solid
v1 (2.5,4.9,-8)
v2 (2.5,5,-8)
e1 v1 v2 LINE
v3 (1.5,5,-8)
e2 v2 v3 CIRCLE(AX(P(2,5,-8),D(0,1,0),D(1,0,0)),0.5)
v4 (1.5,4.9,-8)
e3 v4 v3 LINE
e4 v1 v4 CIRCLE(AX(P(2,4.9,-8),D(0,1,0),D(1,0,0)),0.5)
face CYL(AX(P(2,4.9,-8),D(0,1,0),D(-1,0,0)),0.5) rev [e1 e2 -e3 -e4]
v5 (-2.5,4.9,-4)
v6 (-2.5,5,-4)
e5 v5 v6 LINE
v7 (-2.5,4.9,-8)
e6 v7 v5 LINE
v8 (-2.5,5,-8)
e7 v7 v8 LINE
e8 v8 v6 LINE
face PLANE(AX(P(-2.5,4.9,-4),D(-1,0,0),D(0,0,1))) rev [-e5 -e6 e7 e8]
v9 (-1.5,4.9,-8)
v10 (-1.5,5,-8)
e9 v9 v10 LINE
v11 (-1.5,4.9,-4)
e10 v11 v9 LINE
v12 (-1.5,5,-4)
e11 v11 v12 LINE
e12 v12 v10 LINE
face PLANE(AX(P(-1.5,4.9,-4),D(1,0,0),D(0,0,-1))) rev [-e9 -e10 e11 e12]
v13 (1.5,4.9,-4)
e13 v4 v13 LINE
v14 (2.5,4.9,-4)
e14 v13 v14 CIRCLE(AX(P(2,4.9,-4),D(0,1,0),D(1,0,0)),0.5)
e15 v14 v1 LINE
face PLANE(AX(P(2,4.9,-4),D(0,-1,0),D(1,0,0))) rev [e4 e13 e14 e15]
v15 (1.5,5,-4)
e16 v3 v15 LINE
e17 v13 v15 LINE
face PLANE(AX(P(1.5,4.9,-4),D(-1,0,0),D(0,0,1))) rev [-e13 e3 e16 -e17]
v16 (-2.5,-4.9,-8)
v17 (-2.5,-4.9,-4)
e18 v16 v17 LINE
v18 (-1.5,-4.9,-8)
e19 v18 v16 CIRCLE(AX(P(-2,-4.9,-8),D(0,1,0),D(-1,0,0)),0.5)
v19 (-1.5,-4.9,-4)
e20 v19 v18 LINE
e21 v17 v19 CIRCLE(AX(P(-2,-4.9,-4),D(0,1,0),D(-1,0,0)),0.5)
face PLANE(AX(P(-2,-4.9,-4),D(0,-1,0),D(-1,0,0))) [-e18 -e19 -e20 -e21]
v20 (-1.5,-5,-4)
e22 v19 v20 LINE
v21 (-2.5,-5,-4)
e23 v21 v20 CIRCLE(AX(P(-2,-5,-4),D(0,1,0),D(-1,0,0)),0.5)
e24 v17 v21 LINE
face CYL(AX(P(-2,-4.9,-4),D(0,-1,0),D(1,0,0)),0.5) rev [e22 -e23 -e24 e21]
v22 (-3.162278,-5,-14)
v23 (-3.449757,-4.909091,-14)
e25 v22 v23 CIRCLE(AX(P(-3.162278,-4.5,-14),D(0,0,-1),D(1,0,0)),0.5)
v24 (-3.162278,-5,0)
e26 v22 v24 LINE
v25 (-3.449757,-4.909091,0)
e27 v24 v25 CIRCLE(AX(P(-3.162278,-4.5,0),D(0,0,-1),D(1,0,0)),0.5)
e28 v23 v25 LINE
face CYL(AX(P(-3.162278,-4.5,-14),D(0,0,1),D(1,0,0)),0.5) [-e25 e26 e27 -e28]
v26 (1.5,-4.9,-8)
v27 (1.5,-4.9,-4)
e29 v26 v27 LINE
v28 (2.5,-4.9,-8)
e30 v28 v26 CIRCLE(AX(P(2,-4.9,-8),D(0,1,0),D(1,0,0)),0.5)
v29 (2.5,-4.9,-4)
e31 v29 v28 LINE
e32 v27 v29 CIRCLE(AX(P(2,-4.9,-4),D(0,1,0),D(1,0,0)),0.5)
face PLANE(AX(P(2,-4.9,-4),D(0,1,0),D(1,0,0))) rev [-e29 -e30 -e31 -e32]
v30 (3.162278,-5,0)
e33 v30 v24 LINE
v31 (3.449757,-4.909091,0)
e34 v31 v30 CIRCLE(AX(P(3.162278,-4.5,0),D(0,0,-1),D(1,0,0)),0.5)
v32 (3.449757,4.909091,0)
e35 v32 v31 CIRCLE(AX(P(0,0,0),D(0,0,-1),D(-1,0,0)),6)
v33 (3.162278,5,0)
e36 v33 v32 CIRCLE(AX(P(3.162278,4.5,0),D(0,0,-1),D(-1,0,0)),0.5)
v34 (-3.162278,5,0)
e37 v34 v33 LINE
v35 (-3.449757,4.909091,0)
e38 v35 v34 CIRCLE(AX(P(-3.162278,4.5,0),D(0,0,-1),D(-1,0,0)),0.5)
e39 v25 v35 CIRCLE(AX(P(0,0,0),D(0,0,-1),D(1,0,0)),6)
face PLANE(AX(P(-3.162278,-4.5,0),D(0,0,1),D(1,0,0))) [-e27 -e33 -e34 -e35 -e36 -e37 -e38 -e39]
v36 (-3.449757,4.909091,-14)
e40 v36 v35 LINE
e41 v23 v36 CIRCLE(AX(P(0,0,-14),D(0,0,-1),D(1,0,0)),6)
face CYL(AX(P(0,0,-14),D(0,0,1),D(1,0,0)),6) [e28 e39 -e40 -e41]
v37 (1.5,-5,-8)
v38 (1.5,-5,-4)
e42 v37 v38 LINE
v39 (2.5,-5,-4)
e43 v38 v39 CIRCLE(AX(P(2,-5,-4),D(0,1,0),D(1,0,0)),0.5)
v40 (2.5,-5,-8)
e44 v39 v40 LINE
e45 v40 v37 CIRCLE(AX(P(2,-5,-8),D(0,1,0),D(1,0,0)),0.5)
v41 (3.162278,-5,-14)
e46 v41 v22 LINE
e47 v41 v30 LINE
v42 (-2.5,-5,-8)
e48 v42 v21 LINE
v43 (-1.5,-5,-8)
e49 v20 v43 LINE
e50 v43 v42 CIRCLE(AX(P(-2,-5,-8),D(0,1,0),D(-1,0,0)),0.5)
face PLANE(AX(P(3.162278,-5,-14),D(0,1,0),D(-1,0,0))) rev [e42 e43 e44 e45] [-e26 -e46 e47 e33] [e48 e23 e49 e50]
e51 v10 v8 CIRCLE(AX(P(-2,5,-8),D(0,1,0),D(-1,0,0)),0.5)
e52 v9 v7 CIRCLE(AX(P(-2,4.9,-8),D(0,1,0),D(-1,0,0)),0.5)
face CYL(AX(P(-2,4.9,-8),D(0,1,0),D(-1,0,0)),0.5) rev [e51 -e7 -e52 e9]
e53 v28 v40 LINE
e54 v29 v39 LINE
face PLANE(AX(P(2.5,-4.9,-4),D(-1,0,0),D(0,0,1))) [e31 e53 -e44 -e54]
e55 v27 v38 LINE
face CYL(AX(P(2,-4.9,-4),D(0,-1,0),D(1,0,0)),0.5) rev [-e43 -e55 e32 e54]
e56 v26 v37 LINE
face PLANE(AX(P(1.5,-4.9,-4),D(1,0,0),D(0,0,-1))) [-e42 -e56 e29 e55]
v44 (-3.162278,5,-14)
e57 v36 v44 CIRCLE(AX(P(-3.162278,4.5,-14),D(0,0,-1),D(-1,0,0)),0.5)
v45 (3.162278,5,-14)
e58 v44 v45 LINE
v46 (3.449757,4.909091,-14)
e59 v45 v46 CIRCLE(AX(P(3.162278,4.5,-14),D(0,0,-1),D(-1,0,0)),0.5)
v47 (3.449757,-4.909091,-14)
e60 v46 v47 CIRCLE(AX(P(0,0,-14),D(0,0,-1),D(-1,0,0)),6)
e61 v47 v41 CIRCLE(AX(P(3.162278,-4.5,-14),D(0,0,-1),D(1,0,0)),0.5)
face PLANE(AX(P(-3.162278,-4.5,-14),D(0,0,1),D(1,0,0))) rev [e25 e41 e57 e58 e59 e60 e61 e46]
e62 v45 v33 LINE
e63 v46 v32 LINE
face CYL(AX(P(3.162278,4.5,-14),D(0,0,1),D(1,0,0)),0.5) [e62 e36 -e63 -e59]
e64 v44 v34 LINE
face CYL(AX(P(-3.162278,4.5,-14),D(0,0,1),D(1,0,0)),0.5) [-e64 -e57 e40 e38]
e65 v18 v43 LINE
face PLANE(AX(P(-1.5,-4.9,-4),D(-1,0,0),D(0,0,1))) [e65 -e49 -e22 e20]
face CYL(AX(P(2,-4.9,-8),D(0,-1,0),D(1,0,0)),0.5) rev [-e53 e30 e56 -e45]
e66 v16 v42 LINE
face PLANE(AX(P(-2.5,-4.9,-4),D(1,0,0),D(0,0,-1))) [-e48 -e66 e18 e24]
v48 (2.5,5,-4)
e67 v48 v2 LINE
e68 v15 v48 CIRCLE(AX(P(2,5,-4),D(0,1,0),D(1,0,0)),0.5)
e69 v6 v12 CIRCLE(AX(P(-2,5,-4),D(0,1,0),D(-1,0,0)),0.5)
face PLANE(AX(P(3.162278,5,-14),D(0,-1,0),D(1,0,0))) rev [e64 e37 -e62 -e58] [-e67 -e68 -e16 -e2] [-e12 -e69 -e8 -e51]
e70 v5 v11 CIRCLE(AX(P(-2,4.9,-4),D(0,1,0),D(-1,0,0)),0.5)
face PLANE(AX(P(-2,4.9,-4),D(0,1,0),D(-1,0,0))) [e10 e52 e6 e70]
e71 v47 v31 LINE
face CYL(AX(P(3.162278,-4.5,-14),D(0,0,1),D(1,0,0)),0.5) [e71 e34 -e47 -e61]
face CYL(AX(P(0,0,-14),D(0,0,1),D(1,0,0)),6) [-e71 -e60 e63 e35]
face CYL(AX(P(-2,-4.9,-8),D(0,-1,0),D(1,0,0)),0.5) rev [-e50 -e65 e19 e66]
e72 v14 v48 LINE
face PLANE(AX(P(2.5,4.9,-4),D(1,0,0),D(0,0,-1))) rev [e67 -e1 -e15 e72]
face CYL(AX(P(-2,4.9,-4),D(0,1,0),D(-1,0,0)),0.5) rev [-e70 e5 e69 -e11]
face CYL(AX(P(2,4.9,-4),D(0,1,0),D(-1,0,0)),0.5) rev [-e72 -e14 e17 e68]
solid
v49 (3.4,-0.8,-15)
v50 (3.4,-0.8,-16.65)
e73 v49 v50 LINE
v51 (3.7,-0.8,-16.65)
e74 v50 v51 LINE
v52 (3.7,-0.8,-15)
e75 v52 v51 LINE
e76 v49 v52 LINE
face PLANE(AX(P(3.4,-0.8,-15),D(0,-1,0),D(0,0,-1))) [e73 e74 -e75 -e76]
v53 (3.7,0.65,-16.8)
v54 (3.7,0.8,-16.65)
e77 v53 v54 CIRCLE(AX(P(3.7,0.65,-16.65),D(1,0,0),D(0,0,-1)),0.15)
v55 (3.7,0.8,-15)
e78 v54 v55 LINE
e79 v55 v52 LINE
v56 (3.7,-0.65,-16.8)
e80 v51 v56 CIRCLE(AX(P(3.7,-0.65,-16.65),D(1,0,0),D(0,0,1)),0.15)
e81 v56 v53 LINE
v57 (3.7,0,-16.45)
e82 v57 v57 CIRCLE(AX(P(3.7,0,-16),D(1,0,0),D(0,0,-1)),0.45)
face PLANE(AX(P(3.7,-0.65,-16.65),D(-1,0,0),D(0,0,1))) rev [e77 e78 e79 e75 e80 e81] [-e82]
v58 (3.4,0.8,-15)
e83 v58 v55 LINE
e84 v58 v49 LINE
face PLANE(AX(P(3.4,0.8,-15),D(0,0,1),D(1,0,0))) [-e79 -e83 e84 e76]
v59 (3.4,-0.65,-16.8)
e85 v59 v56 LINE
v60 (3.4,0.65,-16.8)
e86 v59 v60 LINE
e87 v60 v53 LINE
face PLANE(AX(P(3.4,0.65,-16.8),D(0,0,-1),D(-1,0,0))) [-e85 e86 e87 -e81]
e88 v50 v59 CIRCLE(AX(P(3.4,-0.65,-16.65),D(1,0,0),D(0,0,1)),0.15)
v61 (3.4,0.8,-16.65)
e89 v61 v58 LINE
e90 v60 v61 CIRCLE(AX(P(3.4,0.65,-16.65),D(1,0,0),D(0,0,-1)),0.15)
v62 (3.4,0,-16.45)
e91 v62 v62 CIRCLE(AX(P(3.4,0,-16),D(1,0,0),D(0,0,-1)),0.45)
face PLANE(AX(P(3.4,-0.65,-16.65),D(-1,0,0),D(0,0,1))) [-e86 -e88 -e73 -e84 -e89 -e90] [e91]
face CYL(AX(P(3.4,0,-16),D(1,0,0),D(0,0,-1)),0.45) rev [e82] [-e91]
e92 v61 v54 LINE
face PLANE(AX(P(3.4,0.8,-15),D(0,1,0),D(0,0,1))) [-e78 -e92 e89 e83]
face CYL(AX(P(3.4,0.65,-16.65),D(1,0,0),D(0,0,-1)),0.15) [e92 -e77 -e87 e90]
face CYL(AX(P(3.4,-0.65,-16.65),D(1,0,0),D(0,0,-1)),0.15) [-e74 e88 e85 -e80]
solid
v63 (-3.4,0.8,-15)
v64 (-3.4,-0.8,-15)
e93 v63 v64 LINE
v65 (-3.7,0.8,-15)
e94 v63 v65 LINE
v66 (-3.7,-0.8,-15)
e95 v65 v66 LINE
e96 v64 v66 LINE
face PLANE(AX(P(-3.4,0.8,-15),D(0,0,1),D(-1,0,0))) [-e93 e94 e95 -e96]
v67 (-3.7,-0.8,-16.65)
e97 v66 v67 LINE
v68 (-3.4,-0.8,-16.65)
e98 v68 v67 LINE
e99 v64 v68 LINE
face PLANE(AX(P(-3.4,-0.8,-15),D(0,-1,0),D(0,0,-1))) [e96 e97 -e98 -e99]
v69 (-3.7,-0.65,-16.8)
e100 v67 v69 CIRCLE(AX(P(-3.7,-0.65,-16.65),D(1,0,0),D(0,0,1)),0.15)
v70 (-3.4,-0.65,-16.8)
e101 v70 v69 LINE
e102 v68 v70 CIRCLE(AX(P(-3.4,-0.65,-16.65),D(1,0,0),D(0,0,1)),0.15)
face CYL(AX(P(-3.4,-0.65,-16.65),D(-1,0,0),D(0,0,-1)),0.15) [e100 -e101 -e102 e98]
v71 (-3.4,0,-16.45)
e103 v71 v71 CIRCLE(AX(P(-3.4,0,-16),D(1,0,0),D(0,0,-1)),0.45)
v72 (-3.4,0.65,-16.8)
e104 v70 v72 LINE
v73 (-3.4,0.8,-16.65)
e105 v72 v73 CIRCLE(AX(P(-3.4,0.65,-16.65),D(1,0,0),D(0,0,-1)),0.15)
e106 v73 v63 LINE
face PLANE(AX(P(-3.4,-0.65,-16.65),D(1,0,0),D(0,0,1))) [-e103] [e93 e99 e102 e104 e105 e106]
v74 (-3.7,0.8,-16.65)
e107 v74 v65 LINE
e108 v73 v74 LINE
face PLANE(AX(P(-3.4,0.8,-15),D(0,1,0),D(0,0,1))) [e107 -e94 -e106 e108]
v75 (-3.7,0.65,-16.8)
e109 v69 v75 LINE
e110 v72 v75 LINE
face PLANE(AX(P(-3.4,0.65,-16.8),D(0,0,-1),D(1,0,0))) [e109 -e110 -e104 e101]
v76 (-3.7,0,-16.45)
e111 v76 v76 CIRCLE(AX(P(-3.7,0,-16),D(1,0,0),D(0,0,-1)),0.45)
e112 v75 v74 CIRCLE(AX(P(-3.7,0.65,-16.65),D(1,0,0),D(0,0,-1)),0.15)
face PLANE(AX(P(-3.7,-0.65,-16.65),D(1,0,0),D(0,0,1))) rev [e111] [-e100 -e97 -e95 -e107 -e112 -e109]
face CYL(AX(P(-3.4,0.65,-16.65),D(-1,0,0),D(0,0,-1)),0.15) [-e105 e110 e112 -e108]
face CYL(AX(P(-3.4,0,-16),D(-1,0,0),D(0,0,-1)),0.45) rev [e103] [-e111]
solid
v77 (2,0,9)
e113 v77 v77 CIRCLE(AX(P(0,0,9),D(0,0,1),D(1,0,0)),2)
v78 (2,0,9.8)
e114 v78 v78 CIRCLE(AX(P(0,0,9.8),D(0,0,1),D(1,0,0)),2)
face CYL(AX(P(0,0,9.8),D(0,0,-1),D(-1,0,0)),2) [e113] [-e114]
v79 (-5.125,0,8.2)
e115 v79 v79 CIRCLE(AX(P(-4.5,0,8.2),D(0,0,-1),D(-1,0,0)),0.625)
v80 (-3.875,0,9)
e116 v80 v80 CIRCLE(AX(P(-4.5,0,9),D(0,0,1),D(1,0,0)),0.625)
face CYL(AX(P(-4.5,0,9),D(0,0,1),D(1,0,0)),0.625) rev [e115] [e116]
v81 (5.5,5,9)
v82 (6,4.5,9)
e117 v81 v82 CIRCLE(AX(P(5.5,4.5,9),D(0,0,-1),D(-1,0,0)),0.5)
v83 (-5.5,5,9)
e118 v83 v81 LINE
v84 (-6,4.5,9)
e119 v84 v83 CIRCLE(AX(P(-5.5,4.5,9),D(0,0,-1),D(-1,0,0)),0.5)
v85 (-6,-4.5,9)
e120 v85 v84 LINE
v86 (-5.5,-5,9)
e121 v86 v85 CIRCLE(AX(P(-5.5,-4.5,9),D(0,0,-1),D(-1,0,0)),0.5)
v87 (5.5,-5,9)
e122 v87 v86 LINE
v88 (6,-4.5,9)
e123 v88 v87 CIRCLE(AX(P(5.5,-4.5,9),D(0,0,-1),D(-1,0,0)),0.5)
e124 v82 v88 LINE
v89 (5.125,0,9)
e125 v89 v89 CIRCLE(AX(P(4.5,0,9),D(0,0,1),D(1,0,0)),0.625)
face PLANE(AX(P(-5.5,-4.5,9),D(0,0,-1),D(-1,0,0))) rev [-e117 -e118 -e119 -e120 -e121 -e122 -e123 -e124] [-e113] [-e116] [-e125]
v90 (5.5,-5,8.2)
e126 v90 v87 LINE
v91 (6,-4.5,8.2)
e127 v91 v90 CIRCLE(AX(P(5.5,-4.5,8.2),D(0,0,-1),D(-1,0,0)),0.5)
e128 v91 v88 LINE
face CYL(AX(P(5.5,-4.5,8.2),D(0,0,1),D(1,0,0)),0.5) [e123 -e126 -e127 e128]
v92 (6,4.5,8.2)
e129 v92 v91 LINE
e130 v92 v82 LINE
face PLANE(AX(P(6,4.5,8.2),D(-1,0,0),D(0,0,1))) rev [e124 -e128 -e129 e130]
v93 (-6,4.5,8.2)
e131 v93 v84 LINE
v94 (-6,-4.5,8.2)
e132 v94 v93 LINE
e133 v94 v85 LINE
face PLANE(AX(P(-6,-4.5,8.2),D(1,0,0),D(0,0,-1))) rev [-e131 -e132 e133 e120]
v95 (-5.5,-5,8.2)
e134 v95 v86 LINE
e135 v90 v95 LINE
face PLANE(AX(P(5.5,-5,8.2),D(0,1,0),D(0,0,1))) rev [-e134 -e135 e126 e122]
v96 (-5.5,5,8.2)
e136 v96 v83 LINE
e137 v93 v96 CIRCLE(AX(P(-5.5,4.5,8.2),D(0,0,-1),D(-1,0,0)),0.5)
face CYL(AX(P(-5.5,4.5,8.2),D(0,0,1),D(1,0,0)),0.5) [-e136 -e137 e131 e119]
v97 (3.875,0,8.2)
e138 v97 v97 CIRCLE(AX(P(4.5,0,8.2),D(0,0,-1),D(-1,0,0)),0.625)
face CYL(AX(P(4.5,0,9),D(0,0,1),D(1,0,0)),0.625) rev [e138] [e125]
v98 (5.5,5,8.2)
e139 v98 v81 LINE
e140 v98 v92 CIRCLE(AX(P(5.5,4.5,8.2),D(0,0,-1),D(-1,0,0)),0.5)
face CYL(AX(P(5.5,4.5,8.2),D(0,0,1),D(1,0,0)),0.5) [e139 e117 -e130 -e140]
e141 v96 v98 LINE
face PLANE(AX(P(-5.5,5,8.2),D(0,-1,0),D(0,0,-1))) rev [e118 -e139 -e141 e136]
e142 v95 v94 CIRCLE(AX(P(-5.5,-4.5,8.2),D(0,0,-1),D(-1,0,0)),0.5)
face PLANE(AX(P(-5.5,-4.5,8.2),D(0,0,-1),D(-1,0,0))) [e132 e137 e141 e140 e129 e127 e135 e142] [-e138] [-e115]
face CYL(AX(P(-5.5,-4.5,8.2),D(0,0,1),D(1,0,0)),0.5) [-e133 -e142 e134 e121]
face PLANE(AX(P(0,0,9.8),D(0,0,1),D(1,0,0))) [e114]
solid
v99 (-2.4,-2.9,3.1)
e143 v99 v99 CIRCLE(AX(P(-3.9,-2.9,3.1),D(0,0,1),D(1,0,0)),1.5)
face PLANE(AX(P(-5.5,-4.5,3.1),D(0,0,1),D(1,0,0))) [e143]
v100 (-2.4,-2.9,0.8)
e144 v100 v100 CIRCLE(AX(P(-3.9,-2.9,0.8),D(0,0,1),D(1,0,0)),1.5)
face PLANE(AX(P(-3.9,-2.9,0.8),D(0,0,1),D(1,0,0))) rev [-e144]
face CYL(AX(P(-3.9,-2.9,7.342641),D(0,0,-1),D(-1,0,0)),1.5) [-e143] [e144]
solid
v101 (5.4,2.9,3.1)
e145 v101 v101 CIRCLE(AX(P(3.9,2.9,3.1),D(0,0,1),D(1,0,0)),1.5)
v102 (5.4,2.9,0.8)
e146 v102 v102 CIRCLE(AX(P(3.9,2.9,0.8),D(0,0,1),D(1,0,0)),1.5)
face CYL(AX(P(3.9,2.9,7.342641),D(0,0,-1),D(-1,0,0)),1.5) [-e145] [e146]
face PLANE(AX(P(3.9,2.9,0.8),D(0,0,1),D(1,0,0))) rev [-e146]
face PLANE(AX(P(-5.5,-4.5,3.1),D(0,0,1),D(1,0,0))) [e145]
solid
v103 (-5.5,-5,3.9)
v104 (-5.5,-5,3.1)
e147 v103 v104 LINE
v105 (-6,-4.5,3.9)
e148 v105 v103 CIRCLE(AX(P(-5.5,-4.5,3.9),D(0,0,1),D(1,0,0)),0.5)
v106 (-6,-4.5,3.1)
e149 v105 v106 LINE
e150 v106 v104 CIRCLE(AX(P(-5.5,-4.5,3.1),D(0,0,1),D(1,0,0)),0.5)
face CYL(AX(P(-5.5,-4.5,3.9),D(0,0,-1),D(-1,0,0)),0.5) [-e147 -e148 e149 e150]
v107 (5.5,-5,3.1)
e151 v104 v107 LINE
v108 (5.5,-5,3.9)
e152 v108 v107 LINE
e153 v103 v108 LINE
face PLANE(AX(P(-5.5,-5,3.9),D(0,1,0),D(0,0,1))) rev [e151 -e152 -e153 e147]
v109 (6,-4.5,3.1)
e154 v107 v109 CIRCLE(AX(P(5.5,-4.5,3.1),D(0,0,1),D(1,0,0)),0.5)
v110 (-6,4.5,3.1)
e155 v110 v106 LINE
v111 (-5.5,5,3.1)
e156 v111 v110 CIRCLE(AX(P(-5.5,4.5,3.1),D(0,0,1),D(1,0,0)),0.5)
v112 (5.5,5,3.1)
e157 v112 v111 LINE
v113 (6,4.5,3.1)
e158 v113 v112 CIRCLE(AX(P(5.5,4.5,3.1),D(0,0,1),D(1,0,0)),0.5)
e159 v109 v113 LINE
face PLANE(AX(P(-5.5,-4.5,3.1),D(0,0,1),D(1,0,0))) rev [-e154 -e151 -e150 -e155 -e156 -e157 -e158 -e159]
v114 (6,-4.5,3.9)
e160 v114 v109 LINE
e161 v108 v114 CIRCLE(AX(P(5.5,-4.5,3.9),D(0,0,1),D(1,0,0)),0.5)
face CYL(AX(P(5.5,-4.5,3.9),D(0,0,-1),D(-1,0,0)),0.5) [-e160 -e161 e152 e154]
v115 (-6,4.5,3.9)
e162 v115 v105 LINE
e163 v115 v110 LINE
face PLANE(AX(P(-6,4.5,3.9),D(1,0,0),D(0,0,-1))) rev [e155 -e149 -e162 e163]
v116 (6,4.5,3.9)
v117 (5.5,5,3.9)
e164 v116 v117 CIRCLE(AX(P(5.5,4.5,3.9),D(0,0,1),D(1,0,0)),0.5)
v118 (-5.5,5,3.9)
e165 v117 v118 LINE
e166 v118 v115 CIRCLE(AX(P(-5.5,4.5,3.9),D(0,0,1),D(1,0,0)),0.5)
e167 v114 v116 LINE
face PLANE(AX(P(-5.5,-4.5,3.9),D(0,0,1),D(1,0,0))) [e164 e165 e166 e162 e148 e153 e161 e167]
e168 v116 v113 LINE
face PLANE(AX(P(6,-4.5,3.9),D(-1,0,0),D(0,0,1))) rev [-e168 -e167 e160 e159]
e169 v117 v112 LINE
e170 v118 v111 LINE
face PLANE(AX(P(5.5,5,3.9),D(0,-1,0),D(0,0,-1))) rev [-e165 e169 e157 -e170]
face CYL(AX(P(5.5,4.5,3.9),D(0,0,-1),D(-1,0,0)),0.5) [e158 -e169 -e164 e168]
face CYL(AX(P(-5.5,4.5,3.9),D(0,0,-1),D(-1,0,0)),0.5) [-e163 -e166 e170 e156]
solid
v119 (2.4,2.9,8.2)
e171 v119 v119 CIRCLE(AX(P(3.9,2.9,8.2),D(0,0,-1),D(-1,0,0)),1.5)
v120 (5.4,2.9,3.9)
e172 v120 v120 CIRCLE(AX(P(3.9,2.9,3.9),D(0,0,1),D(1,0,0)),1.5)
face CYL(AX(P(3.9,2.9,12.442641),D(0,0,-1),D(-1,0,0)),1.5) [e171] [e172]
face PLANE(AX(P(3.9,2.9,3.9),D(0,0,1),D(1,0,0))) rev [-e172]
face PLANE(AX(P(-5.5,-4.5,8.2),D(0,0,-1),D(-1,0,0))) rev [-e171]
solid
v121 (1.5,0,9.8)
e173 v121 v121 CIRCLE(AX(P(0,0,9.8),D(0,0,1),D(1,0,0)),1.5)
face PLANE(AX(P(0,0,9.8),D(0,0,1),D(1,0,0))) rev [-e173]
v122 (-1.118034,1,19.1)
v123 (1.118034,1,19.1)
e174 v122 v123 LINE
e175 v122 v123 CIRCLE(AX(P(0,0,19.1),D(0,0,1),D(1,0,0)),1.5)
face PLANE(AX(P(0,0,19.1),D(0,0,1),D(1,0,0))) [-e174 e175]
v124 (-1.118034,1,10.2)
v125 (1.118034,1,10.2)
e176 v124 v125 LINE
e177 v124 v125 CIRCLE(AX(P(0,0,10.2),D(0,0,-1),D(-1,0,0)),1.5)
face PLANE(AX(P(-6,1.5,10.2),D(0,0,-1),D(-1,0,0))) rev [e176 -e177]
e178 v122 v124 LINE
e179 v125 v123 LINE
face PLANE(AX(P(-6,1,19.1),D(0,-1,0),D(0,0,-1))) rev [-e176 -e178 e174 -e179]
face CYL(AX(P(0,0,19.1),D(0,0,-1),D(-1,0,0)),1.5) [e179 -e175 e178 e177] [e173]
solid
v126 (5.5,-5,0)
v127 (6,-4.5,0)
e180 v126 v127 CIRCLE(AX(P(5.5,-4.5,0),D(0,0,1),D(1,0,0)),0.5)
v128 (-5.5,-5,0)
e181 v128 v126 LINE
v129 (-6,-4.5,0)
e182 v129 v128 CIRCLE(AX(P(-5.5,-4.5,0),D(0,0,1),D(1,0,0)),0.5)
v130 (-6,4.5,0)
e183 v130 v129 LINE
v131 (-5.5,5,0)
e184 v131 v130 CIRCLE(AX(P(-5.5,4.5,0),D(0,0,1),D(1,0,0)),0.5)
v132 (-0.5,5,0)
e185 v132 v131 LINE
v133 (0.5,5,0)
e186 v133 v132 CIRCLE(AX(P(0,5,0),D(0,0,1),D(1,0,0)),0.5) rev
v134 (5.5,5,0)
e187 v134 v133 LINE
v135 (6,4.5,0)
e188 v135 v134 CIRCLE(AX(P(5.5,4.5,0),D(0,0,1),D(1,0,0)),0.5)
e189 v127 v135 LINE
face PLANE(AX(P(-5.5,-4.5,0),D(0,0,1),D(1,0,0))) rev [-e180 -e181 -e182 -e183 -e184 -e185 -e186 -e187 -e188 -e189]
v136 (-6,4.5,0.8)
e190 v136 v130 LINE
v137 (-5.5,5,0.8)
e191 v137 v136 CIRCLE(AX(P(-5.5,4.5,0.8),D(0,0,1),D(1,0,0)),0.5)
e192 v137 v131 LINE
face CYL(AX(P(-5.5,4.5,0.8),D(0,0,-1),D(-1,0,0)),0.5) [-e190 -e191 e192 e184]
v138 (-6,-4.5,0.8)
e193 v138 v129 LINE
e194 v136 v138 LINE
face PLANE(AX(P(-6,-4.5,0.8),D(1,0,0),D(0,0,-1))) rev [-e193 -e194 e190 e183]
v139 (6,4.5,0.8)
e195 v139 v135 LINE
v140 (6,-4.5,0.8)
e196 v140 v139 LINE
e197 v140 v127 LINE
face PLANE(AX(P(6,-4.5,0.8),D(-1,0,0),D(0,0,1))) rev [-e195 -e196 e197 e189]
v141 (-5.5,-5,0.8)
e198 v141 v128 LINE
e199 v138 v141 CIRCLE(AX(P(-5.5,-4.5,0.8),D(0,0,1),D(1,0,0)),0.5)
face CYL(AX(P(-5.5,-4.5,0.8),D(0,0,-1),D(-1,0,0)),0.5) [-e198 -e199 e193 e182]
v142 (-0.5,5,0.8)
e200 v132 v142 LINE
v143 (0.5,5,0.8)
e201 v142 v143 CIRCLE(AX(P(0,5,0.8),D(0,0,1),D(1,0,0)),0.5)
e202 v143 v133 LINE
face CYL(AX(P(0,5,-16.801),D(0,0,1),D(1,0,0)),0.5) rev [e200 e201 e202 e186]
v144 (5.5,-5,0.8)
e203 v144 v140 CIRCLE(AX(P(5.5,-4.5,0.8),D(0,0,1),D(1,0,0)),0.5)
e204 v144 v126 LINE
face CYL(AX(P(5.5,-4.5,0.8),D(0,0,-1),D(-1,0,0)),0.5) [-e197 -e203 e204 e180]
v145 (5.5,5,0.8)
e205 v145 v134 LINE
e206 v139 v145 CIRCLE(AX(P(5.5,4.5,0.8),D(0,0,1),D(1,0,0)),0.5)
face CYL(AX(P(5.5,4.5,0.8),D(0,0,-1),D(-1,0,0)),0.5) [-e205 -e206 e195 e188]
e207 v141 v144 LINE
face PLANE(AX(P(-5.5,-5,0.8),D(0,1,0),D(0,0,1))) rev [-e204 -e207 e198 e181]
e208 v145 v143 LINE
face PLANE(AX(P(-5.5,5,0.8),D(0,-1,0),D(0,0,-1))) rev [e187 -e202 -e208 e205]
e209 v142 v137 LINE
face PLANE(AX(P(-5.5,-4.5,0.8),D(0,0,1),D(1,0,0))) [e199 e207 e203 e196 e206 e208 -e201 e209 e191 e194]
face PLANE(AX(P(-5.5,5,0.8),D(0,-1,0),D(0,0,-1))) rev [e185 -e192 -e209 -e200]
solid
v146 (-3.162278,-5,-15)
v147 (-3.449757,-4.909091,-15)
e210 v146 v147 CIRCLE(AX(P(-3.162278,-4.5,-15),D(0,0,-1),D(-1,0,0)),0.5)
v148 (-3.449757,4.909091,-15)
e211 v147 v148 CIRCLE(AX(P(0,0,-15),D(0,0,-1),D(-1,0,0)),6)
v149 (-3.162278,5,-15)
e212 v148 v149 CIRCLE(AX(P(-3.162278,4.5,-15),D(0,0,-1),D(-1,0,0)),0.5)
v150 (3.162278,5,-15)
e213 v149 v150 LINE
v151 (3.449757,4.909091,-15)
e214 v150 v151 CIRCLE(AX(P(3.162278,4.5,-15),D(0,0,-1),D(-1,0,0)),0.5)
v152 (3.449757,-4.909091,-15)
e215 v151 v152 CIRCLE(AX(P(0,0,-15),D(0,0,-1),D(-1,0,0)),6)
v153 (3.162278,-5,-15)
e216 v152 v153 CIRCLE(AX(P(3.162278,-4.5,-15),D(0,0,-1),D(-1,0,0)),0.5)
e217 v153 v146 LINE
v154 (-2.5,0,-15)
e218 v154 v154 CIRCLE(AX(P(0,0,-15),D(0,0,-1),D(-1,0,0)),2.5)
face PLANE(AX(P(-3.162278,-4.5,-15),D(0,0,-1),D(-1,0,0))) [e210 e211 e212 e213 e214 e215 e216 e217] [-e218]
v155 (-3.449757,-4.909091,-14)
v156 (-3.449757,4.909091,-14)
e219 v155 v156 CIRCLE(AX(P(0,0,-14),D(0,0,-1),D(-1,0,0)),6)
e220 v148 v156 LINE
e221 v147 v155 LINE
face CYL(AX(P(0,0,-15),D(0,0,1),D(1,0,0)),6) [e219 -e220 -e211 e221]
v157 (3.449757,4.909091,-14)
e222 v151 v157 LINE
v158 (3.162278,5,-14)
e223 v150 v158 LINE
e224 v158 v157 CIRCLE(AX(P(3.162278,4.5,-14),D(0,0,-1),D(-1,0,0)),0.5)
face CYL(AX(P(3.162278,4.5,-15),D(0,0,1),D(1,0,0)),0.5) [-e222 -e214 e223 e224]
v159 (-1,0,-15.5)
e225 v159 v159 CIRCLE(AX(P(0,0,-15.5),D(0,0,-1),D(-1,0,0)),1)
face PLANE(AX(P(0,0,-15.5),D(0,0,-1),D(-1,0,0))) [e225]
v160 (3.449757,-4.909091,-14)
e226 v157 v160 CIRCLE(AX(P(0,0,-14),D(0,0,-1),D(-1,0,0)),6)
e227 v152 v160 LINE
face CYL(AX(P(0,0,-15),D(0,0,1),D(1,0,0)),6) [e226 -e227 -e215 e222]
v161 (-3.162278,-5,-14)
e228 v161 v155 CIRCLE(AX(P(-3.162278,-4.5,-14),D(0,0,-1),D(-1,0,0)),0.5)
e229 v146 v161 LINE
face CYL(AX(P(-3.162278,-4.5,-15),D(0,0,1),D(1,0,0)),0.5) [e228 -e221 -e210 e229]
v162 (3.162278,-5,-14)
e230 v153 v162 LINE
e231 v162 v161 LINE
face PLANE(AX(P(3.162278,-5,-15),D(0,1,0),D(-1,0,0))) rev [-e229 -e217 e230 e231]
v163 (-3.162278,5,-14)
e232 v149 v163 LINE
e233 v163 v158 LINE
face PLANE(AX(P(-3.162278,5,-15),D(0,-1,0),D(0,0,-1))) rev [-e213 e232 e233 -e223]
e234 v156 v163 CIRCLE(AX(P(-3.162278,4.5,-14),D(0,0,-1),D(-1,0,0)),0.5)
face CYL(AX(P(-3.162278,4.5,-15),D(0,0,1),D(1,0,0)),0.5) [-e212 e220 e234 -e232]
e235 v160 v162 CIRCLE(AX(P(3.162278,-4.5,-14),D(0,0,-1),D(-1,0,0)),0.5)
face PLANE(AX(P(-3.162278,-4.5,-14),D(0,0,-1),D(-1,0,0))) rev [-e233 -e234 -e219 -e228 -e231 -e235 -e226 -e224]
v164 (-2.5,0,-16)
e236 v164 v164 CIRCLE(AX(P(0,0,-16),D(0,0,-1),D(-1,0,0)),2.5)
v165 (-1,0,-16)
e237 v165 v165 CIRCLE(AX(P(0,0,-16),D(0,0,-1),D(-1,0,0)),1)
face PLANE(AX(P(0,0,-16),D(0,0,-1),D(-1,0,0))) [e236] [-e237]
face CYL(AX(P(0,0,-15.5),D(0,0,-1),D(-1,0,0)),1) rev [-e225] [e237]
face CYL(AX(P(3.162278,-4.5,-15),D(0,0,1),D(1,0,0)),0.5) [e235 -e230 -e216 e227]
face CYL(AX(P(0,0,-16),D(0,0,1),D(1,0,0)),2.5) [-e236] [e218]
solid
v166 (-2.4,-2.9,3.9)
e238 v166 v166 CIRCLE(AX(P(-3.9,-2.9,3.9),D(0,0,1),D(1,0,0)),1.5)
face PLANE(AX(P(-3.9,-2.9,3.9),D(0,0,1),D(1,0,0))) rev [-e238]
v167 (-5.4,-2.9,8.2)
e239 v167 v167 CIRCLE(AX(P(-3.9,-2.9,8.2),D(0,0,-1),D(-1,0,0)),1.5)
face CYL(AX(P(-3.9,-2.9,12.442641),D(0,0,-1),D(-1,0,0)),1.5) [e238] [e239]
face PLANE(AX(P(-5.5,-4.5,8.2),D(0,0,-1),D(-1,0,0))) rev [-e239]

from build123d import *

# Parameters (mm, degrees)
BASE_FLANGE1_DEPTH           = 0.8
BOSS_EXTRUDE1_DEPTH          = 14
BOSS_EXTRUDE2_DEPTH          = 1
SKETCH8_R                    = 2.5
BOSS_EXTRUDE3_DEPTH          = 1
SKETCH9_R                    = 1
CUT_EXTRUDE1_DEPTH           = 0.5
SKETCH10_R                   = 0.45
BASE_FLANGE2_DEPTH           = 0.3
BASE_FLANGE3_START           = 0.8
BASE_FLANGE3_DEPTH           = 0.8
BASE_FLANGE4_DEPTH           = 0.8
SKETCH21_R                   = 1.5
BOSS_EXTRUDE4_DEPTH          = 2.3
BOSS_EXTRUDE4_2_DEPTH        = 2.3
SKETCH25_R                   = 1.5
BOSS_EXTRUDE5_DEPTH          = 4.3
BOSS_EXTRUDE5_2_DEPTH        = 4.3
SKETCH26_R                   = 2
BOSS_EXTRUDE6_DEPTH          = 0.8
SKETCH28_R                   = 1.5
BOSS_EXTRUDE7_DEPTH          = 9.3
CUT_EXTRUDE2_DEPTH           = 21.635164162
CUT_EXTRUDE2_DEPTH_BACK      = 21.635164162
SKETCH29_W                   = 8.9
SKETCH29_H                   = 0.5
M1_6_TAPPED_HOLE1_AT_2_COUNT = 2
M1_6_TAPPED_HOLE1_AT_2_PITCH = 9
SKETCH33_R                   = 0.5
CUT_EXTRUDE3_DEPTH           = 0.8
CUT_EXTRUDE4_DEPTH           = 0.1


# Sheet-metal steps are written as plain solids
with BuildPart() as part:
    # Sketch1 → Base-Flange1 (new body)
    with BuildSketch(Plane.XY):
        with BuildLine():
            Line((-5.5, -5), (5.5, -5))
            ThreePointArc((5.5, -5), (5.853553391, -4.853553391), (6, -4.5))
            Line((6, -4.5), (6, 4.5))
            ThreePointArc((6, 4.5), (5.853553391, 4.853553391), (5.5, 5))
            Line((5.5, 5), (-5.5, 5))
            ThreePointArc((-5.5, 5), (-5.853553391, 4.853553391), (-6, 4.5))
            Line((-6, 4.5), (-6, -4.5))
            ThreePointArc((-6, -4.5), (-5.853553391, -4.853553391), (-5.5, -5))
        make_face()
    extrude(amount=BASE_FLANGE1_DEPTH)

    # Sketch33 → Cut-Extrude3 (cut)
    with BuildSketch(Plane.XY.offset(0.8)):
        with Locations((0, 5)):
            Circle(SKETCH33_R)
    extrude(amount=-CUT_EXTRUDE3_DEPTH, mode=Mode.SUBTRACT)


with BuildPart() as body_2:
    # Sketch6 → Boss-Extrude1 (new body)
    with BuildSketch(Plane(origin=(0, 0, 0), x_dir=(-1, 0, 0), z_dir=(0, 0, -1))):
        with BuildLine():
            Line((-3.16227766, 5), (3.16227766, 5))
            ThreePointArc((3.16227766, 5), (3.313033332, 4.976731295), (3.449757447, 4.909090909))
            ThreePointArc((3.449757447, 4.909090909), (6, 0), (3.449757447, -4.909090909))
            ThreePointArc((3.449757447, -4.909090909), (3.313033332, -4.976731295), (3.16227766, -5))
            Line((3.16227766, -5), (-3.16227766, -5))
            ThreePointArc((-3.16227766, -5), (-3.313033332, -4.976731295), (-3.449757447, -4.909090909))
            ThreePointArc((-3.449757447, -4.909090909), (-6, 0), (-3.449757447, 4.909090909))
            ThreePointArc((-3.449757447, 4.909090909), (-3.313033332, 4.976731295), (-3.16227766, 5))
        make_face()
    extrude(amount=BOSS_EXTRUDE1_DEPTH)

    # Sketch34 → Cut-Extrude4 (cut)
    with BuildSketch(Plane(origin=(0, 5, 0), x_dir=(1, 0, 0), z_dir=(0, 1, 0))):
        with BuildLine():
            Line((-2.5, 4), (-2.5, 8))
            ThreePointArc((-2.5, 8), (-2, 8.5), (-1.5, 8))
            Line((-1.5, 8), (-1.5, 4))
            ThreePointArc((-1.5, 4), (-2, 3.5), (-2.5, 4))
        make_face()
        with BuildLine():
            Line((2.5, 4), (2.5, 8))
            ThreePointArc((2.5, 8), (2, 8.5), (1.5, 8))
            Line((1.5, 8), (1.5, 4))
            ThreePointArc((1.5, 4), (2, 3.5), (2.5, 4))
        make_face()
    cut_extrude4 = extrude(amount=-CUT_EXTRUDE4_DEPTH, mode=Mode.SUBTRACT)

    # Mirror2: Cut-Extrude4 across plane
    add(cut_extrude4.mirror(Plane.ZX), mode=Mode.SUBTRACT)


with BuildPart() as body_3:
    # Sketch7 → Boss-Extrude2 (new body)
    with BuildSketch(Plane(origin=(0, 0, -14), x_dir=(-1, 0, 0), z_dir=(0, 0, -1))):
        with BuildLine():
            Line((3.16227766, 5), (-3.16227766, 5))
            ThreePointArc((-3.16227766, 5), (-3.313033332, 4.976731295), (-3.449757447, 4.909090909))
            ThreePointArc((-3.449757447, 4.909090909), (-6, 0), (-3.449757447, -4.909090909))
            ThreePointArc((-3.449757447, -4.909090909), (-3.313033332, -4.976731295), (-3.16227766, -5))
            Line((-3.16227766, -5), (3.16227766, -5))
            ThreePointArc((3.16227766, -5), (3.313033332, -4.976731295), (3.449757447, -4.909090909))
            ThreePointArc((3.449757447, -4.909090909), (6, 0), (3.449757447, 4.909090909))
            ThreePointArc((3.449757447, 4.909090909), (3.313033332, 4.976731295), (3.16227766, 5))
        make_face()
    extrude(amount=BOSS_EXTRUDE2_DEPTH)

    # Sketch8 → Boss-Extrude3 (add)
    with BuildSketch(Plane(origin=(0, 0, -15), x_dir=(-1, 0, 0), z_dir=(0, 0, -1))):
        Circle(SKETCH8_R)
    extrude(amount=BOSS_EXTRUDE3_DEPTH)

    # Sketch9 → Cut-Extrude1 (cut)
    with BuildSketch(Plane(origin=(0, 0, -16), x_dir=(-1, 0, 0), z_dir=(0, 0, -1))):
        Circle(SKETCH9_R)
    extrude(amount=-CUT_EXTRUDE1_DEPTH, mode=Mode.SUBTRACT)


with BuildPart() as body_4:
    # Sketch10 → Base-Flange2 (new body)
    with BuildSketch(Plane(origin=(3.7, 0, 0), x_dir=(0, 0, -1), z_dir=(1, 0, 0))):
        with BuildLine():
            Line((15, 0.8), (16.65, 0.8))
            ThreePointArc((16.65, 0.8), (16.756066017, 0.756066017), (16.8, 0.65))
            Line((16.8, 0.65), (16.8, -0.65))
            ThreePointArc((16.8, -0.65), (16.756066017, -0.756066017), (16.65, -0.8))
            Line((16.65, -0.8), (15, -0.8))
            Line((15, -0.8), (15, 0.8))
        make_face()
        with Locations((16, 0)):
            Circle(SKETCH10_R, mode=Mode.SUBTRACT)
    extrude(amount=-BASE_FLANGE2_DEPTH)


with BuildPart() as body_5:
    # Mirror1: mirrored copy
    add(body_4.part.mirror(Plane(origin=(0, 0, 0), x_dir=(0, 0, 1), z_dir=(1, 0, 0))))


with BuildPart() as body_6:
    # Sketch15 → Base-Flange3 (new body)
    with BuildSketch(Plane(origin=(0, 0, 9), x_dir=(-1, 0, 0), z_dir=(0, 0, -1)).offset(BASE_FLANGE3_START)):
        with BuildLine():
            Line((-5.5, -5), (5.5, -5))
            ThreePointArc((5.5, -5), (5.853553391, -4.853553391), (6, -4.5))
            Line((6, -4.5), (6, 4.5))
            ThreePointArc((6, 4.5), (5.853553391, 4.853553391), (5.5, 5))
            Line((5.5, 5), (-5.5, 5))
            ThreePointArc((-5.5, 5), (-5.853553391, 4.853553391), (-6, 4.5))
            Line((-6, 4.5), (-6, -4.5))
            ThreePointArc((-6, -4.5), (-5.853553391, -4.853553391), (-5.5, -5))
        make_face()
    extrude(amount=-BASE_FLANGE3_DEPTH)

    # Sketch26 → Boss-Extrude6 (add)
    with BuildSketch(Plane.XY.offset(9)):
        Circle(SKETCH26_R)
    extrude(amount=BOSS_EXTRUDE6_DEPTH)

    # Sketch32 → M1.6 Tapped Hole1 (revolve, cut)
    with BuildSketch(Plane(origin=(-4.5, 0, 9), x_dir=(0, -1, 0), z_dir=(1, 0, 0))):
        Polygon((0, 0), (0, 1.375537887), (0.625, 1), (0.625, 0), align=None)
    m1_6_tapped_hole1 = revolve(axis=Axis((-4.5, 0, 15.35), (0, 0, -1)), mode=Mode.SUBTRACT)

    # M1.6 Tapped Hole1 at 2: M1.6 Tapped Hole1 ×2
    with Locations(*[(i * M1_6_TAPPED_HOLE1_AT_2_PITCH, 0, 0) for i in range(1, M1_6_TAPPED_HOLE1_AT_2_COUNT)]):
        add(m1_6_tapped_hole1, mode=Mode.SUBTRACT)


with BuildPart() as body_7:
    # Sketch18 → Base-Flange4 (new body)
    with BuildSketch(Plane.XY.offset(3.1)):
        with BuildLine():
            Line((-5.5, -5), (5.5, -5))
            ThreePointArc((5.5, -5), (5.853553391, -4.853553391), (6, -4.5))
            Line((6, -4.5), (6, 4.5))
            ThreePointArc((6, 4.5), (5.853553391, 4.853553391), (5.5, 5))
            Line((5.5, 5), (-5.5, 5))
            ThreePointArc((-5.5, 5), (-5.853553391, 4.853553391), (-6, 4.5))
            Line((-6, 4.5), (-6, -4.5))
            ThreePointArc((-6, -4.5), (-5.853553391, -4.853553391), (-5.5, -5))
        make_face()
    extrude(amount=BASE_FLANGE4_DEPTH)


with BuildPart() as body_8:
    # Sketch21 → Boss-Extrude4 (new body)
    with BuildSketch(Plane.XY.offset(0.8)):
        with Locations((3.9, 2.9)):
            Circle(SKETCH21_R)
    extrude(amount=BOSS_EXTRUDE4_DEPTH)


with BuildPart() as body_9:
    # Sketch21 → Boss-Extrude4 2 (new body)
    with BuildSketch(Plane.XY.offset(0.8)):
        with Locations((-3.9, -2.9)):
            Circle(SKETCH21_R)
    extrude(amount=BOSS_EXTRUDE4_2_DEPTH)


with BuildPart() as body_10:
    # Sketch25 → Boss-Extrude5 (new body)
    with BuildSketch(Plane.XY.offset(3.9)):
        with Locations(Location((3.9, 2.9, 0), (0, 0, 180))):
            Circle(SKETCH25_R)
    extrude(amount=BOSS_EXTRUDE5_DEPTH)


with BuildPart() as body_11:
    # Sketch25 → Boss-Extrude5 2 (new body)
    with BuildSketch(Plane.XY.offset(3.9)):
        with Locations(Location((-3.9, -2.9, 0), (0, 0, 180))):
            Circle(SKETCH25_R)
    extrude(amount=BOSS_EXTRUDE5_2_DEPTH)


with BuildPart() as body_12:
    # Sketch28 → Boss-Extrude7 (new body)
    with BuildSketch(Plane.XY.offset(9.8)):
        Circle(SKETCH28_R)
    extrude(amount=BOSS_EXTRUDE7_DEPTH)

    # Sketch29 → Cut-Extrude2 (cut, two sides: drawn at the far end of the back side and taken through both)
    with BuildSketch(Plane(origin=(0, 0, 0), x_dir=(0, 0, -1), z_dir=(1, 0, 0)).offset(-CUT_EXTRUDE2_DEPTH_BACK)):
        with Locations((-14.65, 1.25)):
            Rectangle(SKETCH29_W, SKETCH29_H)
    extrude(amount=CUT_EXTRUDE2_DEPTH + CUT_EXTRUDE2_DEPTH_BACK, mode=Mode.SUBTRACT)


solid = Compound([part.part, body_2.part, body_3.part, body_4.part, body_5.part, body_6.part, body_7.part, body_8.part, body_9.part, body_10.part, body_11.part, body_12.part])
